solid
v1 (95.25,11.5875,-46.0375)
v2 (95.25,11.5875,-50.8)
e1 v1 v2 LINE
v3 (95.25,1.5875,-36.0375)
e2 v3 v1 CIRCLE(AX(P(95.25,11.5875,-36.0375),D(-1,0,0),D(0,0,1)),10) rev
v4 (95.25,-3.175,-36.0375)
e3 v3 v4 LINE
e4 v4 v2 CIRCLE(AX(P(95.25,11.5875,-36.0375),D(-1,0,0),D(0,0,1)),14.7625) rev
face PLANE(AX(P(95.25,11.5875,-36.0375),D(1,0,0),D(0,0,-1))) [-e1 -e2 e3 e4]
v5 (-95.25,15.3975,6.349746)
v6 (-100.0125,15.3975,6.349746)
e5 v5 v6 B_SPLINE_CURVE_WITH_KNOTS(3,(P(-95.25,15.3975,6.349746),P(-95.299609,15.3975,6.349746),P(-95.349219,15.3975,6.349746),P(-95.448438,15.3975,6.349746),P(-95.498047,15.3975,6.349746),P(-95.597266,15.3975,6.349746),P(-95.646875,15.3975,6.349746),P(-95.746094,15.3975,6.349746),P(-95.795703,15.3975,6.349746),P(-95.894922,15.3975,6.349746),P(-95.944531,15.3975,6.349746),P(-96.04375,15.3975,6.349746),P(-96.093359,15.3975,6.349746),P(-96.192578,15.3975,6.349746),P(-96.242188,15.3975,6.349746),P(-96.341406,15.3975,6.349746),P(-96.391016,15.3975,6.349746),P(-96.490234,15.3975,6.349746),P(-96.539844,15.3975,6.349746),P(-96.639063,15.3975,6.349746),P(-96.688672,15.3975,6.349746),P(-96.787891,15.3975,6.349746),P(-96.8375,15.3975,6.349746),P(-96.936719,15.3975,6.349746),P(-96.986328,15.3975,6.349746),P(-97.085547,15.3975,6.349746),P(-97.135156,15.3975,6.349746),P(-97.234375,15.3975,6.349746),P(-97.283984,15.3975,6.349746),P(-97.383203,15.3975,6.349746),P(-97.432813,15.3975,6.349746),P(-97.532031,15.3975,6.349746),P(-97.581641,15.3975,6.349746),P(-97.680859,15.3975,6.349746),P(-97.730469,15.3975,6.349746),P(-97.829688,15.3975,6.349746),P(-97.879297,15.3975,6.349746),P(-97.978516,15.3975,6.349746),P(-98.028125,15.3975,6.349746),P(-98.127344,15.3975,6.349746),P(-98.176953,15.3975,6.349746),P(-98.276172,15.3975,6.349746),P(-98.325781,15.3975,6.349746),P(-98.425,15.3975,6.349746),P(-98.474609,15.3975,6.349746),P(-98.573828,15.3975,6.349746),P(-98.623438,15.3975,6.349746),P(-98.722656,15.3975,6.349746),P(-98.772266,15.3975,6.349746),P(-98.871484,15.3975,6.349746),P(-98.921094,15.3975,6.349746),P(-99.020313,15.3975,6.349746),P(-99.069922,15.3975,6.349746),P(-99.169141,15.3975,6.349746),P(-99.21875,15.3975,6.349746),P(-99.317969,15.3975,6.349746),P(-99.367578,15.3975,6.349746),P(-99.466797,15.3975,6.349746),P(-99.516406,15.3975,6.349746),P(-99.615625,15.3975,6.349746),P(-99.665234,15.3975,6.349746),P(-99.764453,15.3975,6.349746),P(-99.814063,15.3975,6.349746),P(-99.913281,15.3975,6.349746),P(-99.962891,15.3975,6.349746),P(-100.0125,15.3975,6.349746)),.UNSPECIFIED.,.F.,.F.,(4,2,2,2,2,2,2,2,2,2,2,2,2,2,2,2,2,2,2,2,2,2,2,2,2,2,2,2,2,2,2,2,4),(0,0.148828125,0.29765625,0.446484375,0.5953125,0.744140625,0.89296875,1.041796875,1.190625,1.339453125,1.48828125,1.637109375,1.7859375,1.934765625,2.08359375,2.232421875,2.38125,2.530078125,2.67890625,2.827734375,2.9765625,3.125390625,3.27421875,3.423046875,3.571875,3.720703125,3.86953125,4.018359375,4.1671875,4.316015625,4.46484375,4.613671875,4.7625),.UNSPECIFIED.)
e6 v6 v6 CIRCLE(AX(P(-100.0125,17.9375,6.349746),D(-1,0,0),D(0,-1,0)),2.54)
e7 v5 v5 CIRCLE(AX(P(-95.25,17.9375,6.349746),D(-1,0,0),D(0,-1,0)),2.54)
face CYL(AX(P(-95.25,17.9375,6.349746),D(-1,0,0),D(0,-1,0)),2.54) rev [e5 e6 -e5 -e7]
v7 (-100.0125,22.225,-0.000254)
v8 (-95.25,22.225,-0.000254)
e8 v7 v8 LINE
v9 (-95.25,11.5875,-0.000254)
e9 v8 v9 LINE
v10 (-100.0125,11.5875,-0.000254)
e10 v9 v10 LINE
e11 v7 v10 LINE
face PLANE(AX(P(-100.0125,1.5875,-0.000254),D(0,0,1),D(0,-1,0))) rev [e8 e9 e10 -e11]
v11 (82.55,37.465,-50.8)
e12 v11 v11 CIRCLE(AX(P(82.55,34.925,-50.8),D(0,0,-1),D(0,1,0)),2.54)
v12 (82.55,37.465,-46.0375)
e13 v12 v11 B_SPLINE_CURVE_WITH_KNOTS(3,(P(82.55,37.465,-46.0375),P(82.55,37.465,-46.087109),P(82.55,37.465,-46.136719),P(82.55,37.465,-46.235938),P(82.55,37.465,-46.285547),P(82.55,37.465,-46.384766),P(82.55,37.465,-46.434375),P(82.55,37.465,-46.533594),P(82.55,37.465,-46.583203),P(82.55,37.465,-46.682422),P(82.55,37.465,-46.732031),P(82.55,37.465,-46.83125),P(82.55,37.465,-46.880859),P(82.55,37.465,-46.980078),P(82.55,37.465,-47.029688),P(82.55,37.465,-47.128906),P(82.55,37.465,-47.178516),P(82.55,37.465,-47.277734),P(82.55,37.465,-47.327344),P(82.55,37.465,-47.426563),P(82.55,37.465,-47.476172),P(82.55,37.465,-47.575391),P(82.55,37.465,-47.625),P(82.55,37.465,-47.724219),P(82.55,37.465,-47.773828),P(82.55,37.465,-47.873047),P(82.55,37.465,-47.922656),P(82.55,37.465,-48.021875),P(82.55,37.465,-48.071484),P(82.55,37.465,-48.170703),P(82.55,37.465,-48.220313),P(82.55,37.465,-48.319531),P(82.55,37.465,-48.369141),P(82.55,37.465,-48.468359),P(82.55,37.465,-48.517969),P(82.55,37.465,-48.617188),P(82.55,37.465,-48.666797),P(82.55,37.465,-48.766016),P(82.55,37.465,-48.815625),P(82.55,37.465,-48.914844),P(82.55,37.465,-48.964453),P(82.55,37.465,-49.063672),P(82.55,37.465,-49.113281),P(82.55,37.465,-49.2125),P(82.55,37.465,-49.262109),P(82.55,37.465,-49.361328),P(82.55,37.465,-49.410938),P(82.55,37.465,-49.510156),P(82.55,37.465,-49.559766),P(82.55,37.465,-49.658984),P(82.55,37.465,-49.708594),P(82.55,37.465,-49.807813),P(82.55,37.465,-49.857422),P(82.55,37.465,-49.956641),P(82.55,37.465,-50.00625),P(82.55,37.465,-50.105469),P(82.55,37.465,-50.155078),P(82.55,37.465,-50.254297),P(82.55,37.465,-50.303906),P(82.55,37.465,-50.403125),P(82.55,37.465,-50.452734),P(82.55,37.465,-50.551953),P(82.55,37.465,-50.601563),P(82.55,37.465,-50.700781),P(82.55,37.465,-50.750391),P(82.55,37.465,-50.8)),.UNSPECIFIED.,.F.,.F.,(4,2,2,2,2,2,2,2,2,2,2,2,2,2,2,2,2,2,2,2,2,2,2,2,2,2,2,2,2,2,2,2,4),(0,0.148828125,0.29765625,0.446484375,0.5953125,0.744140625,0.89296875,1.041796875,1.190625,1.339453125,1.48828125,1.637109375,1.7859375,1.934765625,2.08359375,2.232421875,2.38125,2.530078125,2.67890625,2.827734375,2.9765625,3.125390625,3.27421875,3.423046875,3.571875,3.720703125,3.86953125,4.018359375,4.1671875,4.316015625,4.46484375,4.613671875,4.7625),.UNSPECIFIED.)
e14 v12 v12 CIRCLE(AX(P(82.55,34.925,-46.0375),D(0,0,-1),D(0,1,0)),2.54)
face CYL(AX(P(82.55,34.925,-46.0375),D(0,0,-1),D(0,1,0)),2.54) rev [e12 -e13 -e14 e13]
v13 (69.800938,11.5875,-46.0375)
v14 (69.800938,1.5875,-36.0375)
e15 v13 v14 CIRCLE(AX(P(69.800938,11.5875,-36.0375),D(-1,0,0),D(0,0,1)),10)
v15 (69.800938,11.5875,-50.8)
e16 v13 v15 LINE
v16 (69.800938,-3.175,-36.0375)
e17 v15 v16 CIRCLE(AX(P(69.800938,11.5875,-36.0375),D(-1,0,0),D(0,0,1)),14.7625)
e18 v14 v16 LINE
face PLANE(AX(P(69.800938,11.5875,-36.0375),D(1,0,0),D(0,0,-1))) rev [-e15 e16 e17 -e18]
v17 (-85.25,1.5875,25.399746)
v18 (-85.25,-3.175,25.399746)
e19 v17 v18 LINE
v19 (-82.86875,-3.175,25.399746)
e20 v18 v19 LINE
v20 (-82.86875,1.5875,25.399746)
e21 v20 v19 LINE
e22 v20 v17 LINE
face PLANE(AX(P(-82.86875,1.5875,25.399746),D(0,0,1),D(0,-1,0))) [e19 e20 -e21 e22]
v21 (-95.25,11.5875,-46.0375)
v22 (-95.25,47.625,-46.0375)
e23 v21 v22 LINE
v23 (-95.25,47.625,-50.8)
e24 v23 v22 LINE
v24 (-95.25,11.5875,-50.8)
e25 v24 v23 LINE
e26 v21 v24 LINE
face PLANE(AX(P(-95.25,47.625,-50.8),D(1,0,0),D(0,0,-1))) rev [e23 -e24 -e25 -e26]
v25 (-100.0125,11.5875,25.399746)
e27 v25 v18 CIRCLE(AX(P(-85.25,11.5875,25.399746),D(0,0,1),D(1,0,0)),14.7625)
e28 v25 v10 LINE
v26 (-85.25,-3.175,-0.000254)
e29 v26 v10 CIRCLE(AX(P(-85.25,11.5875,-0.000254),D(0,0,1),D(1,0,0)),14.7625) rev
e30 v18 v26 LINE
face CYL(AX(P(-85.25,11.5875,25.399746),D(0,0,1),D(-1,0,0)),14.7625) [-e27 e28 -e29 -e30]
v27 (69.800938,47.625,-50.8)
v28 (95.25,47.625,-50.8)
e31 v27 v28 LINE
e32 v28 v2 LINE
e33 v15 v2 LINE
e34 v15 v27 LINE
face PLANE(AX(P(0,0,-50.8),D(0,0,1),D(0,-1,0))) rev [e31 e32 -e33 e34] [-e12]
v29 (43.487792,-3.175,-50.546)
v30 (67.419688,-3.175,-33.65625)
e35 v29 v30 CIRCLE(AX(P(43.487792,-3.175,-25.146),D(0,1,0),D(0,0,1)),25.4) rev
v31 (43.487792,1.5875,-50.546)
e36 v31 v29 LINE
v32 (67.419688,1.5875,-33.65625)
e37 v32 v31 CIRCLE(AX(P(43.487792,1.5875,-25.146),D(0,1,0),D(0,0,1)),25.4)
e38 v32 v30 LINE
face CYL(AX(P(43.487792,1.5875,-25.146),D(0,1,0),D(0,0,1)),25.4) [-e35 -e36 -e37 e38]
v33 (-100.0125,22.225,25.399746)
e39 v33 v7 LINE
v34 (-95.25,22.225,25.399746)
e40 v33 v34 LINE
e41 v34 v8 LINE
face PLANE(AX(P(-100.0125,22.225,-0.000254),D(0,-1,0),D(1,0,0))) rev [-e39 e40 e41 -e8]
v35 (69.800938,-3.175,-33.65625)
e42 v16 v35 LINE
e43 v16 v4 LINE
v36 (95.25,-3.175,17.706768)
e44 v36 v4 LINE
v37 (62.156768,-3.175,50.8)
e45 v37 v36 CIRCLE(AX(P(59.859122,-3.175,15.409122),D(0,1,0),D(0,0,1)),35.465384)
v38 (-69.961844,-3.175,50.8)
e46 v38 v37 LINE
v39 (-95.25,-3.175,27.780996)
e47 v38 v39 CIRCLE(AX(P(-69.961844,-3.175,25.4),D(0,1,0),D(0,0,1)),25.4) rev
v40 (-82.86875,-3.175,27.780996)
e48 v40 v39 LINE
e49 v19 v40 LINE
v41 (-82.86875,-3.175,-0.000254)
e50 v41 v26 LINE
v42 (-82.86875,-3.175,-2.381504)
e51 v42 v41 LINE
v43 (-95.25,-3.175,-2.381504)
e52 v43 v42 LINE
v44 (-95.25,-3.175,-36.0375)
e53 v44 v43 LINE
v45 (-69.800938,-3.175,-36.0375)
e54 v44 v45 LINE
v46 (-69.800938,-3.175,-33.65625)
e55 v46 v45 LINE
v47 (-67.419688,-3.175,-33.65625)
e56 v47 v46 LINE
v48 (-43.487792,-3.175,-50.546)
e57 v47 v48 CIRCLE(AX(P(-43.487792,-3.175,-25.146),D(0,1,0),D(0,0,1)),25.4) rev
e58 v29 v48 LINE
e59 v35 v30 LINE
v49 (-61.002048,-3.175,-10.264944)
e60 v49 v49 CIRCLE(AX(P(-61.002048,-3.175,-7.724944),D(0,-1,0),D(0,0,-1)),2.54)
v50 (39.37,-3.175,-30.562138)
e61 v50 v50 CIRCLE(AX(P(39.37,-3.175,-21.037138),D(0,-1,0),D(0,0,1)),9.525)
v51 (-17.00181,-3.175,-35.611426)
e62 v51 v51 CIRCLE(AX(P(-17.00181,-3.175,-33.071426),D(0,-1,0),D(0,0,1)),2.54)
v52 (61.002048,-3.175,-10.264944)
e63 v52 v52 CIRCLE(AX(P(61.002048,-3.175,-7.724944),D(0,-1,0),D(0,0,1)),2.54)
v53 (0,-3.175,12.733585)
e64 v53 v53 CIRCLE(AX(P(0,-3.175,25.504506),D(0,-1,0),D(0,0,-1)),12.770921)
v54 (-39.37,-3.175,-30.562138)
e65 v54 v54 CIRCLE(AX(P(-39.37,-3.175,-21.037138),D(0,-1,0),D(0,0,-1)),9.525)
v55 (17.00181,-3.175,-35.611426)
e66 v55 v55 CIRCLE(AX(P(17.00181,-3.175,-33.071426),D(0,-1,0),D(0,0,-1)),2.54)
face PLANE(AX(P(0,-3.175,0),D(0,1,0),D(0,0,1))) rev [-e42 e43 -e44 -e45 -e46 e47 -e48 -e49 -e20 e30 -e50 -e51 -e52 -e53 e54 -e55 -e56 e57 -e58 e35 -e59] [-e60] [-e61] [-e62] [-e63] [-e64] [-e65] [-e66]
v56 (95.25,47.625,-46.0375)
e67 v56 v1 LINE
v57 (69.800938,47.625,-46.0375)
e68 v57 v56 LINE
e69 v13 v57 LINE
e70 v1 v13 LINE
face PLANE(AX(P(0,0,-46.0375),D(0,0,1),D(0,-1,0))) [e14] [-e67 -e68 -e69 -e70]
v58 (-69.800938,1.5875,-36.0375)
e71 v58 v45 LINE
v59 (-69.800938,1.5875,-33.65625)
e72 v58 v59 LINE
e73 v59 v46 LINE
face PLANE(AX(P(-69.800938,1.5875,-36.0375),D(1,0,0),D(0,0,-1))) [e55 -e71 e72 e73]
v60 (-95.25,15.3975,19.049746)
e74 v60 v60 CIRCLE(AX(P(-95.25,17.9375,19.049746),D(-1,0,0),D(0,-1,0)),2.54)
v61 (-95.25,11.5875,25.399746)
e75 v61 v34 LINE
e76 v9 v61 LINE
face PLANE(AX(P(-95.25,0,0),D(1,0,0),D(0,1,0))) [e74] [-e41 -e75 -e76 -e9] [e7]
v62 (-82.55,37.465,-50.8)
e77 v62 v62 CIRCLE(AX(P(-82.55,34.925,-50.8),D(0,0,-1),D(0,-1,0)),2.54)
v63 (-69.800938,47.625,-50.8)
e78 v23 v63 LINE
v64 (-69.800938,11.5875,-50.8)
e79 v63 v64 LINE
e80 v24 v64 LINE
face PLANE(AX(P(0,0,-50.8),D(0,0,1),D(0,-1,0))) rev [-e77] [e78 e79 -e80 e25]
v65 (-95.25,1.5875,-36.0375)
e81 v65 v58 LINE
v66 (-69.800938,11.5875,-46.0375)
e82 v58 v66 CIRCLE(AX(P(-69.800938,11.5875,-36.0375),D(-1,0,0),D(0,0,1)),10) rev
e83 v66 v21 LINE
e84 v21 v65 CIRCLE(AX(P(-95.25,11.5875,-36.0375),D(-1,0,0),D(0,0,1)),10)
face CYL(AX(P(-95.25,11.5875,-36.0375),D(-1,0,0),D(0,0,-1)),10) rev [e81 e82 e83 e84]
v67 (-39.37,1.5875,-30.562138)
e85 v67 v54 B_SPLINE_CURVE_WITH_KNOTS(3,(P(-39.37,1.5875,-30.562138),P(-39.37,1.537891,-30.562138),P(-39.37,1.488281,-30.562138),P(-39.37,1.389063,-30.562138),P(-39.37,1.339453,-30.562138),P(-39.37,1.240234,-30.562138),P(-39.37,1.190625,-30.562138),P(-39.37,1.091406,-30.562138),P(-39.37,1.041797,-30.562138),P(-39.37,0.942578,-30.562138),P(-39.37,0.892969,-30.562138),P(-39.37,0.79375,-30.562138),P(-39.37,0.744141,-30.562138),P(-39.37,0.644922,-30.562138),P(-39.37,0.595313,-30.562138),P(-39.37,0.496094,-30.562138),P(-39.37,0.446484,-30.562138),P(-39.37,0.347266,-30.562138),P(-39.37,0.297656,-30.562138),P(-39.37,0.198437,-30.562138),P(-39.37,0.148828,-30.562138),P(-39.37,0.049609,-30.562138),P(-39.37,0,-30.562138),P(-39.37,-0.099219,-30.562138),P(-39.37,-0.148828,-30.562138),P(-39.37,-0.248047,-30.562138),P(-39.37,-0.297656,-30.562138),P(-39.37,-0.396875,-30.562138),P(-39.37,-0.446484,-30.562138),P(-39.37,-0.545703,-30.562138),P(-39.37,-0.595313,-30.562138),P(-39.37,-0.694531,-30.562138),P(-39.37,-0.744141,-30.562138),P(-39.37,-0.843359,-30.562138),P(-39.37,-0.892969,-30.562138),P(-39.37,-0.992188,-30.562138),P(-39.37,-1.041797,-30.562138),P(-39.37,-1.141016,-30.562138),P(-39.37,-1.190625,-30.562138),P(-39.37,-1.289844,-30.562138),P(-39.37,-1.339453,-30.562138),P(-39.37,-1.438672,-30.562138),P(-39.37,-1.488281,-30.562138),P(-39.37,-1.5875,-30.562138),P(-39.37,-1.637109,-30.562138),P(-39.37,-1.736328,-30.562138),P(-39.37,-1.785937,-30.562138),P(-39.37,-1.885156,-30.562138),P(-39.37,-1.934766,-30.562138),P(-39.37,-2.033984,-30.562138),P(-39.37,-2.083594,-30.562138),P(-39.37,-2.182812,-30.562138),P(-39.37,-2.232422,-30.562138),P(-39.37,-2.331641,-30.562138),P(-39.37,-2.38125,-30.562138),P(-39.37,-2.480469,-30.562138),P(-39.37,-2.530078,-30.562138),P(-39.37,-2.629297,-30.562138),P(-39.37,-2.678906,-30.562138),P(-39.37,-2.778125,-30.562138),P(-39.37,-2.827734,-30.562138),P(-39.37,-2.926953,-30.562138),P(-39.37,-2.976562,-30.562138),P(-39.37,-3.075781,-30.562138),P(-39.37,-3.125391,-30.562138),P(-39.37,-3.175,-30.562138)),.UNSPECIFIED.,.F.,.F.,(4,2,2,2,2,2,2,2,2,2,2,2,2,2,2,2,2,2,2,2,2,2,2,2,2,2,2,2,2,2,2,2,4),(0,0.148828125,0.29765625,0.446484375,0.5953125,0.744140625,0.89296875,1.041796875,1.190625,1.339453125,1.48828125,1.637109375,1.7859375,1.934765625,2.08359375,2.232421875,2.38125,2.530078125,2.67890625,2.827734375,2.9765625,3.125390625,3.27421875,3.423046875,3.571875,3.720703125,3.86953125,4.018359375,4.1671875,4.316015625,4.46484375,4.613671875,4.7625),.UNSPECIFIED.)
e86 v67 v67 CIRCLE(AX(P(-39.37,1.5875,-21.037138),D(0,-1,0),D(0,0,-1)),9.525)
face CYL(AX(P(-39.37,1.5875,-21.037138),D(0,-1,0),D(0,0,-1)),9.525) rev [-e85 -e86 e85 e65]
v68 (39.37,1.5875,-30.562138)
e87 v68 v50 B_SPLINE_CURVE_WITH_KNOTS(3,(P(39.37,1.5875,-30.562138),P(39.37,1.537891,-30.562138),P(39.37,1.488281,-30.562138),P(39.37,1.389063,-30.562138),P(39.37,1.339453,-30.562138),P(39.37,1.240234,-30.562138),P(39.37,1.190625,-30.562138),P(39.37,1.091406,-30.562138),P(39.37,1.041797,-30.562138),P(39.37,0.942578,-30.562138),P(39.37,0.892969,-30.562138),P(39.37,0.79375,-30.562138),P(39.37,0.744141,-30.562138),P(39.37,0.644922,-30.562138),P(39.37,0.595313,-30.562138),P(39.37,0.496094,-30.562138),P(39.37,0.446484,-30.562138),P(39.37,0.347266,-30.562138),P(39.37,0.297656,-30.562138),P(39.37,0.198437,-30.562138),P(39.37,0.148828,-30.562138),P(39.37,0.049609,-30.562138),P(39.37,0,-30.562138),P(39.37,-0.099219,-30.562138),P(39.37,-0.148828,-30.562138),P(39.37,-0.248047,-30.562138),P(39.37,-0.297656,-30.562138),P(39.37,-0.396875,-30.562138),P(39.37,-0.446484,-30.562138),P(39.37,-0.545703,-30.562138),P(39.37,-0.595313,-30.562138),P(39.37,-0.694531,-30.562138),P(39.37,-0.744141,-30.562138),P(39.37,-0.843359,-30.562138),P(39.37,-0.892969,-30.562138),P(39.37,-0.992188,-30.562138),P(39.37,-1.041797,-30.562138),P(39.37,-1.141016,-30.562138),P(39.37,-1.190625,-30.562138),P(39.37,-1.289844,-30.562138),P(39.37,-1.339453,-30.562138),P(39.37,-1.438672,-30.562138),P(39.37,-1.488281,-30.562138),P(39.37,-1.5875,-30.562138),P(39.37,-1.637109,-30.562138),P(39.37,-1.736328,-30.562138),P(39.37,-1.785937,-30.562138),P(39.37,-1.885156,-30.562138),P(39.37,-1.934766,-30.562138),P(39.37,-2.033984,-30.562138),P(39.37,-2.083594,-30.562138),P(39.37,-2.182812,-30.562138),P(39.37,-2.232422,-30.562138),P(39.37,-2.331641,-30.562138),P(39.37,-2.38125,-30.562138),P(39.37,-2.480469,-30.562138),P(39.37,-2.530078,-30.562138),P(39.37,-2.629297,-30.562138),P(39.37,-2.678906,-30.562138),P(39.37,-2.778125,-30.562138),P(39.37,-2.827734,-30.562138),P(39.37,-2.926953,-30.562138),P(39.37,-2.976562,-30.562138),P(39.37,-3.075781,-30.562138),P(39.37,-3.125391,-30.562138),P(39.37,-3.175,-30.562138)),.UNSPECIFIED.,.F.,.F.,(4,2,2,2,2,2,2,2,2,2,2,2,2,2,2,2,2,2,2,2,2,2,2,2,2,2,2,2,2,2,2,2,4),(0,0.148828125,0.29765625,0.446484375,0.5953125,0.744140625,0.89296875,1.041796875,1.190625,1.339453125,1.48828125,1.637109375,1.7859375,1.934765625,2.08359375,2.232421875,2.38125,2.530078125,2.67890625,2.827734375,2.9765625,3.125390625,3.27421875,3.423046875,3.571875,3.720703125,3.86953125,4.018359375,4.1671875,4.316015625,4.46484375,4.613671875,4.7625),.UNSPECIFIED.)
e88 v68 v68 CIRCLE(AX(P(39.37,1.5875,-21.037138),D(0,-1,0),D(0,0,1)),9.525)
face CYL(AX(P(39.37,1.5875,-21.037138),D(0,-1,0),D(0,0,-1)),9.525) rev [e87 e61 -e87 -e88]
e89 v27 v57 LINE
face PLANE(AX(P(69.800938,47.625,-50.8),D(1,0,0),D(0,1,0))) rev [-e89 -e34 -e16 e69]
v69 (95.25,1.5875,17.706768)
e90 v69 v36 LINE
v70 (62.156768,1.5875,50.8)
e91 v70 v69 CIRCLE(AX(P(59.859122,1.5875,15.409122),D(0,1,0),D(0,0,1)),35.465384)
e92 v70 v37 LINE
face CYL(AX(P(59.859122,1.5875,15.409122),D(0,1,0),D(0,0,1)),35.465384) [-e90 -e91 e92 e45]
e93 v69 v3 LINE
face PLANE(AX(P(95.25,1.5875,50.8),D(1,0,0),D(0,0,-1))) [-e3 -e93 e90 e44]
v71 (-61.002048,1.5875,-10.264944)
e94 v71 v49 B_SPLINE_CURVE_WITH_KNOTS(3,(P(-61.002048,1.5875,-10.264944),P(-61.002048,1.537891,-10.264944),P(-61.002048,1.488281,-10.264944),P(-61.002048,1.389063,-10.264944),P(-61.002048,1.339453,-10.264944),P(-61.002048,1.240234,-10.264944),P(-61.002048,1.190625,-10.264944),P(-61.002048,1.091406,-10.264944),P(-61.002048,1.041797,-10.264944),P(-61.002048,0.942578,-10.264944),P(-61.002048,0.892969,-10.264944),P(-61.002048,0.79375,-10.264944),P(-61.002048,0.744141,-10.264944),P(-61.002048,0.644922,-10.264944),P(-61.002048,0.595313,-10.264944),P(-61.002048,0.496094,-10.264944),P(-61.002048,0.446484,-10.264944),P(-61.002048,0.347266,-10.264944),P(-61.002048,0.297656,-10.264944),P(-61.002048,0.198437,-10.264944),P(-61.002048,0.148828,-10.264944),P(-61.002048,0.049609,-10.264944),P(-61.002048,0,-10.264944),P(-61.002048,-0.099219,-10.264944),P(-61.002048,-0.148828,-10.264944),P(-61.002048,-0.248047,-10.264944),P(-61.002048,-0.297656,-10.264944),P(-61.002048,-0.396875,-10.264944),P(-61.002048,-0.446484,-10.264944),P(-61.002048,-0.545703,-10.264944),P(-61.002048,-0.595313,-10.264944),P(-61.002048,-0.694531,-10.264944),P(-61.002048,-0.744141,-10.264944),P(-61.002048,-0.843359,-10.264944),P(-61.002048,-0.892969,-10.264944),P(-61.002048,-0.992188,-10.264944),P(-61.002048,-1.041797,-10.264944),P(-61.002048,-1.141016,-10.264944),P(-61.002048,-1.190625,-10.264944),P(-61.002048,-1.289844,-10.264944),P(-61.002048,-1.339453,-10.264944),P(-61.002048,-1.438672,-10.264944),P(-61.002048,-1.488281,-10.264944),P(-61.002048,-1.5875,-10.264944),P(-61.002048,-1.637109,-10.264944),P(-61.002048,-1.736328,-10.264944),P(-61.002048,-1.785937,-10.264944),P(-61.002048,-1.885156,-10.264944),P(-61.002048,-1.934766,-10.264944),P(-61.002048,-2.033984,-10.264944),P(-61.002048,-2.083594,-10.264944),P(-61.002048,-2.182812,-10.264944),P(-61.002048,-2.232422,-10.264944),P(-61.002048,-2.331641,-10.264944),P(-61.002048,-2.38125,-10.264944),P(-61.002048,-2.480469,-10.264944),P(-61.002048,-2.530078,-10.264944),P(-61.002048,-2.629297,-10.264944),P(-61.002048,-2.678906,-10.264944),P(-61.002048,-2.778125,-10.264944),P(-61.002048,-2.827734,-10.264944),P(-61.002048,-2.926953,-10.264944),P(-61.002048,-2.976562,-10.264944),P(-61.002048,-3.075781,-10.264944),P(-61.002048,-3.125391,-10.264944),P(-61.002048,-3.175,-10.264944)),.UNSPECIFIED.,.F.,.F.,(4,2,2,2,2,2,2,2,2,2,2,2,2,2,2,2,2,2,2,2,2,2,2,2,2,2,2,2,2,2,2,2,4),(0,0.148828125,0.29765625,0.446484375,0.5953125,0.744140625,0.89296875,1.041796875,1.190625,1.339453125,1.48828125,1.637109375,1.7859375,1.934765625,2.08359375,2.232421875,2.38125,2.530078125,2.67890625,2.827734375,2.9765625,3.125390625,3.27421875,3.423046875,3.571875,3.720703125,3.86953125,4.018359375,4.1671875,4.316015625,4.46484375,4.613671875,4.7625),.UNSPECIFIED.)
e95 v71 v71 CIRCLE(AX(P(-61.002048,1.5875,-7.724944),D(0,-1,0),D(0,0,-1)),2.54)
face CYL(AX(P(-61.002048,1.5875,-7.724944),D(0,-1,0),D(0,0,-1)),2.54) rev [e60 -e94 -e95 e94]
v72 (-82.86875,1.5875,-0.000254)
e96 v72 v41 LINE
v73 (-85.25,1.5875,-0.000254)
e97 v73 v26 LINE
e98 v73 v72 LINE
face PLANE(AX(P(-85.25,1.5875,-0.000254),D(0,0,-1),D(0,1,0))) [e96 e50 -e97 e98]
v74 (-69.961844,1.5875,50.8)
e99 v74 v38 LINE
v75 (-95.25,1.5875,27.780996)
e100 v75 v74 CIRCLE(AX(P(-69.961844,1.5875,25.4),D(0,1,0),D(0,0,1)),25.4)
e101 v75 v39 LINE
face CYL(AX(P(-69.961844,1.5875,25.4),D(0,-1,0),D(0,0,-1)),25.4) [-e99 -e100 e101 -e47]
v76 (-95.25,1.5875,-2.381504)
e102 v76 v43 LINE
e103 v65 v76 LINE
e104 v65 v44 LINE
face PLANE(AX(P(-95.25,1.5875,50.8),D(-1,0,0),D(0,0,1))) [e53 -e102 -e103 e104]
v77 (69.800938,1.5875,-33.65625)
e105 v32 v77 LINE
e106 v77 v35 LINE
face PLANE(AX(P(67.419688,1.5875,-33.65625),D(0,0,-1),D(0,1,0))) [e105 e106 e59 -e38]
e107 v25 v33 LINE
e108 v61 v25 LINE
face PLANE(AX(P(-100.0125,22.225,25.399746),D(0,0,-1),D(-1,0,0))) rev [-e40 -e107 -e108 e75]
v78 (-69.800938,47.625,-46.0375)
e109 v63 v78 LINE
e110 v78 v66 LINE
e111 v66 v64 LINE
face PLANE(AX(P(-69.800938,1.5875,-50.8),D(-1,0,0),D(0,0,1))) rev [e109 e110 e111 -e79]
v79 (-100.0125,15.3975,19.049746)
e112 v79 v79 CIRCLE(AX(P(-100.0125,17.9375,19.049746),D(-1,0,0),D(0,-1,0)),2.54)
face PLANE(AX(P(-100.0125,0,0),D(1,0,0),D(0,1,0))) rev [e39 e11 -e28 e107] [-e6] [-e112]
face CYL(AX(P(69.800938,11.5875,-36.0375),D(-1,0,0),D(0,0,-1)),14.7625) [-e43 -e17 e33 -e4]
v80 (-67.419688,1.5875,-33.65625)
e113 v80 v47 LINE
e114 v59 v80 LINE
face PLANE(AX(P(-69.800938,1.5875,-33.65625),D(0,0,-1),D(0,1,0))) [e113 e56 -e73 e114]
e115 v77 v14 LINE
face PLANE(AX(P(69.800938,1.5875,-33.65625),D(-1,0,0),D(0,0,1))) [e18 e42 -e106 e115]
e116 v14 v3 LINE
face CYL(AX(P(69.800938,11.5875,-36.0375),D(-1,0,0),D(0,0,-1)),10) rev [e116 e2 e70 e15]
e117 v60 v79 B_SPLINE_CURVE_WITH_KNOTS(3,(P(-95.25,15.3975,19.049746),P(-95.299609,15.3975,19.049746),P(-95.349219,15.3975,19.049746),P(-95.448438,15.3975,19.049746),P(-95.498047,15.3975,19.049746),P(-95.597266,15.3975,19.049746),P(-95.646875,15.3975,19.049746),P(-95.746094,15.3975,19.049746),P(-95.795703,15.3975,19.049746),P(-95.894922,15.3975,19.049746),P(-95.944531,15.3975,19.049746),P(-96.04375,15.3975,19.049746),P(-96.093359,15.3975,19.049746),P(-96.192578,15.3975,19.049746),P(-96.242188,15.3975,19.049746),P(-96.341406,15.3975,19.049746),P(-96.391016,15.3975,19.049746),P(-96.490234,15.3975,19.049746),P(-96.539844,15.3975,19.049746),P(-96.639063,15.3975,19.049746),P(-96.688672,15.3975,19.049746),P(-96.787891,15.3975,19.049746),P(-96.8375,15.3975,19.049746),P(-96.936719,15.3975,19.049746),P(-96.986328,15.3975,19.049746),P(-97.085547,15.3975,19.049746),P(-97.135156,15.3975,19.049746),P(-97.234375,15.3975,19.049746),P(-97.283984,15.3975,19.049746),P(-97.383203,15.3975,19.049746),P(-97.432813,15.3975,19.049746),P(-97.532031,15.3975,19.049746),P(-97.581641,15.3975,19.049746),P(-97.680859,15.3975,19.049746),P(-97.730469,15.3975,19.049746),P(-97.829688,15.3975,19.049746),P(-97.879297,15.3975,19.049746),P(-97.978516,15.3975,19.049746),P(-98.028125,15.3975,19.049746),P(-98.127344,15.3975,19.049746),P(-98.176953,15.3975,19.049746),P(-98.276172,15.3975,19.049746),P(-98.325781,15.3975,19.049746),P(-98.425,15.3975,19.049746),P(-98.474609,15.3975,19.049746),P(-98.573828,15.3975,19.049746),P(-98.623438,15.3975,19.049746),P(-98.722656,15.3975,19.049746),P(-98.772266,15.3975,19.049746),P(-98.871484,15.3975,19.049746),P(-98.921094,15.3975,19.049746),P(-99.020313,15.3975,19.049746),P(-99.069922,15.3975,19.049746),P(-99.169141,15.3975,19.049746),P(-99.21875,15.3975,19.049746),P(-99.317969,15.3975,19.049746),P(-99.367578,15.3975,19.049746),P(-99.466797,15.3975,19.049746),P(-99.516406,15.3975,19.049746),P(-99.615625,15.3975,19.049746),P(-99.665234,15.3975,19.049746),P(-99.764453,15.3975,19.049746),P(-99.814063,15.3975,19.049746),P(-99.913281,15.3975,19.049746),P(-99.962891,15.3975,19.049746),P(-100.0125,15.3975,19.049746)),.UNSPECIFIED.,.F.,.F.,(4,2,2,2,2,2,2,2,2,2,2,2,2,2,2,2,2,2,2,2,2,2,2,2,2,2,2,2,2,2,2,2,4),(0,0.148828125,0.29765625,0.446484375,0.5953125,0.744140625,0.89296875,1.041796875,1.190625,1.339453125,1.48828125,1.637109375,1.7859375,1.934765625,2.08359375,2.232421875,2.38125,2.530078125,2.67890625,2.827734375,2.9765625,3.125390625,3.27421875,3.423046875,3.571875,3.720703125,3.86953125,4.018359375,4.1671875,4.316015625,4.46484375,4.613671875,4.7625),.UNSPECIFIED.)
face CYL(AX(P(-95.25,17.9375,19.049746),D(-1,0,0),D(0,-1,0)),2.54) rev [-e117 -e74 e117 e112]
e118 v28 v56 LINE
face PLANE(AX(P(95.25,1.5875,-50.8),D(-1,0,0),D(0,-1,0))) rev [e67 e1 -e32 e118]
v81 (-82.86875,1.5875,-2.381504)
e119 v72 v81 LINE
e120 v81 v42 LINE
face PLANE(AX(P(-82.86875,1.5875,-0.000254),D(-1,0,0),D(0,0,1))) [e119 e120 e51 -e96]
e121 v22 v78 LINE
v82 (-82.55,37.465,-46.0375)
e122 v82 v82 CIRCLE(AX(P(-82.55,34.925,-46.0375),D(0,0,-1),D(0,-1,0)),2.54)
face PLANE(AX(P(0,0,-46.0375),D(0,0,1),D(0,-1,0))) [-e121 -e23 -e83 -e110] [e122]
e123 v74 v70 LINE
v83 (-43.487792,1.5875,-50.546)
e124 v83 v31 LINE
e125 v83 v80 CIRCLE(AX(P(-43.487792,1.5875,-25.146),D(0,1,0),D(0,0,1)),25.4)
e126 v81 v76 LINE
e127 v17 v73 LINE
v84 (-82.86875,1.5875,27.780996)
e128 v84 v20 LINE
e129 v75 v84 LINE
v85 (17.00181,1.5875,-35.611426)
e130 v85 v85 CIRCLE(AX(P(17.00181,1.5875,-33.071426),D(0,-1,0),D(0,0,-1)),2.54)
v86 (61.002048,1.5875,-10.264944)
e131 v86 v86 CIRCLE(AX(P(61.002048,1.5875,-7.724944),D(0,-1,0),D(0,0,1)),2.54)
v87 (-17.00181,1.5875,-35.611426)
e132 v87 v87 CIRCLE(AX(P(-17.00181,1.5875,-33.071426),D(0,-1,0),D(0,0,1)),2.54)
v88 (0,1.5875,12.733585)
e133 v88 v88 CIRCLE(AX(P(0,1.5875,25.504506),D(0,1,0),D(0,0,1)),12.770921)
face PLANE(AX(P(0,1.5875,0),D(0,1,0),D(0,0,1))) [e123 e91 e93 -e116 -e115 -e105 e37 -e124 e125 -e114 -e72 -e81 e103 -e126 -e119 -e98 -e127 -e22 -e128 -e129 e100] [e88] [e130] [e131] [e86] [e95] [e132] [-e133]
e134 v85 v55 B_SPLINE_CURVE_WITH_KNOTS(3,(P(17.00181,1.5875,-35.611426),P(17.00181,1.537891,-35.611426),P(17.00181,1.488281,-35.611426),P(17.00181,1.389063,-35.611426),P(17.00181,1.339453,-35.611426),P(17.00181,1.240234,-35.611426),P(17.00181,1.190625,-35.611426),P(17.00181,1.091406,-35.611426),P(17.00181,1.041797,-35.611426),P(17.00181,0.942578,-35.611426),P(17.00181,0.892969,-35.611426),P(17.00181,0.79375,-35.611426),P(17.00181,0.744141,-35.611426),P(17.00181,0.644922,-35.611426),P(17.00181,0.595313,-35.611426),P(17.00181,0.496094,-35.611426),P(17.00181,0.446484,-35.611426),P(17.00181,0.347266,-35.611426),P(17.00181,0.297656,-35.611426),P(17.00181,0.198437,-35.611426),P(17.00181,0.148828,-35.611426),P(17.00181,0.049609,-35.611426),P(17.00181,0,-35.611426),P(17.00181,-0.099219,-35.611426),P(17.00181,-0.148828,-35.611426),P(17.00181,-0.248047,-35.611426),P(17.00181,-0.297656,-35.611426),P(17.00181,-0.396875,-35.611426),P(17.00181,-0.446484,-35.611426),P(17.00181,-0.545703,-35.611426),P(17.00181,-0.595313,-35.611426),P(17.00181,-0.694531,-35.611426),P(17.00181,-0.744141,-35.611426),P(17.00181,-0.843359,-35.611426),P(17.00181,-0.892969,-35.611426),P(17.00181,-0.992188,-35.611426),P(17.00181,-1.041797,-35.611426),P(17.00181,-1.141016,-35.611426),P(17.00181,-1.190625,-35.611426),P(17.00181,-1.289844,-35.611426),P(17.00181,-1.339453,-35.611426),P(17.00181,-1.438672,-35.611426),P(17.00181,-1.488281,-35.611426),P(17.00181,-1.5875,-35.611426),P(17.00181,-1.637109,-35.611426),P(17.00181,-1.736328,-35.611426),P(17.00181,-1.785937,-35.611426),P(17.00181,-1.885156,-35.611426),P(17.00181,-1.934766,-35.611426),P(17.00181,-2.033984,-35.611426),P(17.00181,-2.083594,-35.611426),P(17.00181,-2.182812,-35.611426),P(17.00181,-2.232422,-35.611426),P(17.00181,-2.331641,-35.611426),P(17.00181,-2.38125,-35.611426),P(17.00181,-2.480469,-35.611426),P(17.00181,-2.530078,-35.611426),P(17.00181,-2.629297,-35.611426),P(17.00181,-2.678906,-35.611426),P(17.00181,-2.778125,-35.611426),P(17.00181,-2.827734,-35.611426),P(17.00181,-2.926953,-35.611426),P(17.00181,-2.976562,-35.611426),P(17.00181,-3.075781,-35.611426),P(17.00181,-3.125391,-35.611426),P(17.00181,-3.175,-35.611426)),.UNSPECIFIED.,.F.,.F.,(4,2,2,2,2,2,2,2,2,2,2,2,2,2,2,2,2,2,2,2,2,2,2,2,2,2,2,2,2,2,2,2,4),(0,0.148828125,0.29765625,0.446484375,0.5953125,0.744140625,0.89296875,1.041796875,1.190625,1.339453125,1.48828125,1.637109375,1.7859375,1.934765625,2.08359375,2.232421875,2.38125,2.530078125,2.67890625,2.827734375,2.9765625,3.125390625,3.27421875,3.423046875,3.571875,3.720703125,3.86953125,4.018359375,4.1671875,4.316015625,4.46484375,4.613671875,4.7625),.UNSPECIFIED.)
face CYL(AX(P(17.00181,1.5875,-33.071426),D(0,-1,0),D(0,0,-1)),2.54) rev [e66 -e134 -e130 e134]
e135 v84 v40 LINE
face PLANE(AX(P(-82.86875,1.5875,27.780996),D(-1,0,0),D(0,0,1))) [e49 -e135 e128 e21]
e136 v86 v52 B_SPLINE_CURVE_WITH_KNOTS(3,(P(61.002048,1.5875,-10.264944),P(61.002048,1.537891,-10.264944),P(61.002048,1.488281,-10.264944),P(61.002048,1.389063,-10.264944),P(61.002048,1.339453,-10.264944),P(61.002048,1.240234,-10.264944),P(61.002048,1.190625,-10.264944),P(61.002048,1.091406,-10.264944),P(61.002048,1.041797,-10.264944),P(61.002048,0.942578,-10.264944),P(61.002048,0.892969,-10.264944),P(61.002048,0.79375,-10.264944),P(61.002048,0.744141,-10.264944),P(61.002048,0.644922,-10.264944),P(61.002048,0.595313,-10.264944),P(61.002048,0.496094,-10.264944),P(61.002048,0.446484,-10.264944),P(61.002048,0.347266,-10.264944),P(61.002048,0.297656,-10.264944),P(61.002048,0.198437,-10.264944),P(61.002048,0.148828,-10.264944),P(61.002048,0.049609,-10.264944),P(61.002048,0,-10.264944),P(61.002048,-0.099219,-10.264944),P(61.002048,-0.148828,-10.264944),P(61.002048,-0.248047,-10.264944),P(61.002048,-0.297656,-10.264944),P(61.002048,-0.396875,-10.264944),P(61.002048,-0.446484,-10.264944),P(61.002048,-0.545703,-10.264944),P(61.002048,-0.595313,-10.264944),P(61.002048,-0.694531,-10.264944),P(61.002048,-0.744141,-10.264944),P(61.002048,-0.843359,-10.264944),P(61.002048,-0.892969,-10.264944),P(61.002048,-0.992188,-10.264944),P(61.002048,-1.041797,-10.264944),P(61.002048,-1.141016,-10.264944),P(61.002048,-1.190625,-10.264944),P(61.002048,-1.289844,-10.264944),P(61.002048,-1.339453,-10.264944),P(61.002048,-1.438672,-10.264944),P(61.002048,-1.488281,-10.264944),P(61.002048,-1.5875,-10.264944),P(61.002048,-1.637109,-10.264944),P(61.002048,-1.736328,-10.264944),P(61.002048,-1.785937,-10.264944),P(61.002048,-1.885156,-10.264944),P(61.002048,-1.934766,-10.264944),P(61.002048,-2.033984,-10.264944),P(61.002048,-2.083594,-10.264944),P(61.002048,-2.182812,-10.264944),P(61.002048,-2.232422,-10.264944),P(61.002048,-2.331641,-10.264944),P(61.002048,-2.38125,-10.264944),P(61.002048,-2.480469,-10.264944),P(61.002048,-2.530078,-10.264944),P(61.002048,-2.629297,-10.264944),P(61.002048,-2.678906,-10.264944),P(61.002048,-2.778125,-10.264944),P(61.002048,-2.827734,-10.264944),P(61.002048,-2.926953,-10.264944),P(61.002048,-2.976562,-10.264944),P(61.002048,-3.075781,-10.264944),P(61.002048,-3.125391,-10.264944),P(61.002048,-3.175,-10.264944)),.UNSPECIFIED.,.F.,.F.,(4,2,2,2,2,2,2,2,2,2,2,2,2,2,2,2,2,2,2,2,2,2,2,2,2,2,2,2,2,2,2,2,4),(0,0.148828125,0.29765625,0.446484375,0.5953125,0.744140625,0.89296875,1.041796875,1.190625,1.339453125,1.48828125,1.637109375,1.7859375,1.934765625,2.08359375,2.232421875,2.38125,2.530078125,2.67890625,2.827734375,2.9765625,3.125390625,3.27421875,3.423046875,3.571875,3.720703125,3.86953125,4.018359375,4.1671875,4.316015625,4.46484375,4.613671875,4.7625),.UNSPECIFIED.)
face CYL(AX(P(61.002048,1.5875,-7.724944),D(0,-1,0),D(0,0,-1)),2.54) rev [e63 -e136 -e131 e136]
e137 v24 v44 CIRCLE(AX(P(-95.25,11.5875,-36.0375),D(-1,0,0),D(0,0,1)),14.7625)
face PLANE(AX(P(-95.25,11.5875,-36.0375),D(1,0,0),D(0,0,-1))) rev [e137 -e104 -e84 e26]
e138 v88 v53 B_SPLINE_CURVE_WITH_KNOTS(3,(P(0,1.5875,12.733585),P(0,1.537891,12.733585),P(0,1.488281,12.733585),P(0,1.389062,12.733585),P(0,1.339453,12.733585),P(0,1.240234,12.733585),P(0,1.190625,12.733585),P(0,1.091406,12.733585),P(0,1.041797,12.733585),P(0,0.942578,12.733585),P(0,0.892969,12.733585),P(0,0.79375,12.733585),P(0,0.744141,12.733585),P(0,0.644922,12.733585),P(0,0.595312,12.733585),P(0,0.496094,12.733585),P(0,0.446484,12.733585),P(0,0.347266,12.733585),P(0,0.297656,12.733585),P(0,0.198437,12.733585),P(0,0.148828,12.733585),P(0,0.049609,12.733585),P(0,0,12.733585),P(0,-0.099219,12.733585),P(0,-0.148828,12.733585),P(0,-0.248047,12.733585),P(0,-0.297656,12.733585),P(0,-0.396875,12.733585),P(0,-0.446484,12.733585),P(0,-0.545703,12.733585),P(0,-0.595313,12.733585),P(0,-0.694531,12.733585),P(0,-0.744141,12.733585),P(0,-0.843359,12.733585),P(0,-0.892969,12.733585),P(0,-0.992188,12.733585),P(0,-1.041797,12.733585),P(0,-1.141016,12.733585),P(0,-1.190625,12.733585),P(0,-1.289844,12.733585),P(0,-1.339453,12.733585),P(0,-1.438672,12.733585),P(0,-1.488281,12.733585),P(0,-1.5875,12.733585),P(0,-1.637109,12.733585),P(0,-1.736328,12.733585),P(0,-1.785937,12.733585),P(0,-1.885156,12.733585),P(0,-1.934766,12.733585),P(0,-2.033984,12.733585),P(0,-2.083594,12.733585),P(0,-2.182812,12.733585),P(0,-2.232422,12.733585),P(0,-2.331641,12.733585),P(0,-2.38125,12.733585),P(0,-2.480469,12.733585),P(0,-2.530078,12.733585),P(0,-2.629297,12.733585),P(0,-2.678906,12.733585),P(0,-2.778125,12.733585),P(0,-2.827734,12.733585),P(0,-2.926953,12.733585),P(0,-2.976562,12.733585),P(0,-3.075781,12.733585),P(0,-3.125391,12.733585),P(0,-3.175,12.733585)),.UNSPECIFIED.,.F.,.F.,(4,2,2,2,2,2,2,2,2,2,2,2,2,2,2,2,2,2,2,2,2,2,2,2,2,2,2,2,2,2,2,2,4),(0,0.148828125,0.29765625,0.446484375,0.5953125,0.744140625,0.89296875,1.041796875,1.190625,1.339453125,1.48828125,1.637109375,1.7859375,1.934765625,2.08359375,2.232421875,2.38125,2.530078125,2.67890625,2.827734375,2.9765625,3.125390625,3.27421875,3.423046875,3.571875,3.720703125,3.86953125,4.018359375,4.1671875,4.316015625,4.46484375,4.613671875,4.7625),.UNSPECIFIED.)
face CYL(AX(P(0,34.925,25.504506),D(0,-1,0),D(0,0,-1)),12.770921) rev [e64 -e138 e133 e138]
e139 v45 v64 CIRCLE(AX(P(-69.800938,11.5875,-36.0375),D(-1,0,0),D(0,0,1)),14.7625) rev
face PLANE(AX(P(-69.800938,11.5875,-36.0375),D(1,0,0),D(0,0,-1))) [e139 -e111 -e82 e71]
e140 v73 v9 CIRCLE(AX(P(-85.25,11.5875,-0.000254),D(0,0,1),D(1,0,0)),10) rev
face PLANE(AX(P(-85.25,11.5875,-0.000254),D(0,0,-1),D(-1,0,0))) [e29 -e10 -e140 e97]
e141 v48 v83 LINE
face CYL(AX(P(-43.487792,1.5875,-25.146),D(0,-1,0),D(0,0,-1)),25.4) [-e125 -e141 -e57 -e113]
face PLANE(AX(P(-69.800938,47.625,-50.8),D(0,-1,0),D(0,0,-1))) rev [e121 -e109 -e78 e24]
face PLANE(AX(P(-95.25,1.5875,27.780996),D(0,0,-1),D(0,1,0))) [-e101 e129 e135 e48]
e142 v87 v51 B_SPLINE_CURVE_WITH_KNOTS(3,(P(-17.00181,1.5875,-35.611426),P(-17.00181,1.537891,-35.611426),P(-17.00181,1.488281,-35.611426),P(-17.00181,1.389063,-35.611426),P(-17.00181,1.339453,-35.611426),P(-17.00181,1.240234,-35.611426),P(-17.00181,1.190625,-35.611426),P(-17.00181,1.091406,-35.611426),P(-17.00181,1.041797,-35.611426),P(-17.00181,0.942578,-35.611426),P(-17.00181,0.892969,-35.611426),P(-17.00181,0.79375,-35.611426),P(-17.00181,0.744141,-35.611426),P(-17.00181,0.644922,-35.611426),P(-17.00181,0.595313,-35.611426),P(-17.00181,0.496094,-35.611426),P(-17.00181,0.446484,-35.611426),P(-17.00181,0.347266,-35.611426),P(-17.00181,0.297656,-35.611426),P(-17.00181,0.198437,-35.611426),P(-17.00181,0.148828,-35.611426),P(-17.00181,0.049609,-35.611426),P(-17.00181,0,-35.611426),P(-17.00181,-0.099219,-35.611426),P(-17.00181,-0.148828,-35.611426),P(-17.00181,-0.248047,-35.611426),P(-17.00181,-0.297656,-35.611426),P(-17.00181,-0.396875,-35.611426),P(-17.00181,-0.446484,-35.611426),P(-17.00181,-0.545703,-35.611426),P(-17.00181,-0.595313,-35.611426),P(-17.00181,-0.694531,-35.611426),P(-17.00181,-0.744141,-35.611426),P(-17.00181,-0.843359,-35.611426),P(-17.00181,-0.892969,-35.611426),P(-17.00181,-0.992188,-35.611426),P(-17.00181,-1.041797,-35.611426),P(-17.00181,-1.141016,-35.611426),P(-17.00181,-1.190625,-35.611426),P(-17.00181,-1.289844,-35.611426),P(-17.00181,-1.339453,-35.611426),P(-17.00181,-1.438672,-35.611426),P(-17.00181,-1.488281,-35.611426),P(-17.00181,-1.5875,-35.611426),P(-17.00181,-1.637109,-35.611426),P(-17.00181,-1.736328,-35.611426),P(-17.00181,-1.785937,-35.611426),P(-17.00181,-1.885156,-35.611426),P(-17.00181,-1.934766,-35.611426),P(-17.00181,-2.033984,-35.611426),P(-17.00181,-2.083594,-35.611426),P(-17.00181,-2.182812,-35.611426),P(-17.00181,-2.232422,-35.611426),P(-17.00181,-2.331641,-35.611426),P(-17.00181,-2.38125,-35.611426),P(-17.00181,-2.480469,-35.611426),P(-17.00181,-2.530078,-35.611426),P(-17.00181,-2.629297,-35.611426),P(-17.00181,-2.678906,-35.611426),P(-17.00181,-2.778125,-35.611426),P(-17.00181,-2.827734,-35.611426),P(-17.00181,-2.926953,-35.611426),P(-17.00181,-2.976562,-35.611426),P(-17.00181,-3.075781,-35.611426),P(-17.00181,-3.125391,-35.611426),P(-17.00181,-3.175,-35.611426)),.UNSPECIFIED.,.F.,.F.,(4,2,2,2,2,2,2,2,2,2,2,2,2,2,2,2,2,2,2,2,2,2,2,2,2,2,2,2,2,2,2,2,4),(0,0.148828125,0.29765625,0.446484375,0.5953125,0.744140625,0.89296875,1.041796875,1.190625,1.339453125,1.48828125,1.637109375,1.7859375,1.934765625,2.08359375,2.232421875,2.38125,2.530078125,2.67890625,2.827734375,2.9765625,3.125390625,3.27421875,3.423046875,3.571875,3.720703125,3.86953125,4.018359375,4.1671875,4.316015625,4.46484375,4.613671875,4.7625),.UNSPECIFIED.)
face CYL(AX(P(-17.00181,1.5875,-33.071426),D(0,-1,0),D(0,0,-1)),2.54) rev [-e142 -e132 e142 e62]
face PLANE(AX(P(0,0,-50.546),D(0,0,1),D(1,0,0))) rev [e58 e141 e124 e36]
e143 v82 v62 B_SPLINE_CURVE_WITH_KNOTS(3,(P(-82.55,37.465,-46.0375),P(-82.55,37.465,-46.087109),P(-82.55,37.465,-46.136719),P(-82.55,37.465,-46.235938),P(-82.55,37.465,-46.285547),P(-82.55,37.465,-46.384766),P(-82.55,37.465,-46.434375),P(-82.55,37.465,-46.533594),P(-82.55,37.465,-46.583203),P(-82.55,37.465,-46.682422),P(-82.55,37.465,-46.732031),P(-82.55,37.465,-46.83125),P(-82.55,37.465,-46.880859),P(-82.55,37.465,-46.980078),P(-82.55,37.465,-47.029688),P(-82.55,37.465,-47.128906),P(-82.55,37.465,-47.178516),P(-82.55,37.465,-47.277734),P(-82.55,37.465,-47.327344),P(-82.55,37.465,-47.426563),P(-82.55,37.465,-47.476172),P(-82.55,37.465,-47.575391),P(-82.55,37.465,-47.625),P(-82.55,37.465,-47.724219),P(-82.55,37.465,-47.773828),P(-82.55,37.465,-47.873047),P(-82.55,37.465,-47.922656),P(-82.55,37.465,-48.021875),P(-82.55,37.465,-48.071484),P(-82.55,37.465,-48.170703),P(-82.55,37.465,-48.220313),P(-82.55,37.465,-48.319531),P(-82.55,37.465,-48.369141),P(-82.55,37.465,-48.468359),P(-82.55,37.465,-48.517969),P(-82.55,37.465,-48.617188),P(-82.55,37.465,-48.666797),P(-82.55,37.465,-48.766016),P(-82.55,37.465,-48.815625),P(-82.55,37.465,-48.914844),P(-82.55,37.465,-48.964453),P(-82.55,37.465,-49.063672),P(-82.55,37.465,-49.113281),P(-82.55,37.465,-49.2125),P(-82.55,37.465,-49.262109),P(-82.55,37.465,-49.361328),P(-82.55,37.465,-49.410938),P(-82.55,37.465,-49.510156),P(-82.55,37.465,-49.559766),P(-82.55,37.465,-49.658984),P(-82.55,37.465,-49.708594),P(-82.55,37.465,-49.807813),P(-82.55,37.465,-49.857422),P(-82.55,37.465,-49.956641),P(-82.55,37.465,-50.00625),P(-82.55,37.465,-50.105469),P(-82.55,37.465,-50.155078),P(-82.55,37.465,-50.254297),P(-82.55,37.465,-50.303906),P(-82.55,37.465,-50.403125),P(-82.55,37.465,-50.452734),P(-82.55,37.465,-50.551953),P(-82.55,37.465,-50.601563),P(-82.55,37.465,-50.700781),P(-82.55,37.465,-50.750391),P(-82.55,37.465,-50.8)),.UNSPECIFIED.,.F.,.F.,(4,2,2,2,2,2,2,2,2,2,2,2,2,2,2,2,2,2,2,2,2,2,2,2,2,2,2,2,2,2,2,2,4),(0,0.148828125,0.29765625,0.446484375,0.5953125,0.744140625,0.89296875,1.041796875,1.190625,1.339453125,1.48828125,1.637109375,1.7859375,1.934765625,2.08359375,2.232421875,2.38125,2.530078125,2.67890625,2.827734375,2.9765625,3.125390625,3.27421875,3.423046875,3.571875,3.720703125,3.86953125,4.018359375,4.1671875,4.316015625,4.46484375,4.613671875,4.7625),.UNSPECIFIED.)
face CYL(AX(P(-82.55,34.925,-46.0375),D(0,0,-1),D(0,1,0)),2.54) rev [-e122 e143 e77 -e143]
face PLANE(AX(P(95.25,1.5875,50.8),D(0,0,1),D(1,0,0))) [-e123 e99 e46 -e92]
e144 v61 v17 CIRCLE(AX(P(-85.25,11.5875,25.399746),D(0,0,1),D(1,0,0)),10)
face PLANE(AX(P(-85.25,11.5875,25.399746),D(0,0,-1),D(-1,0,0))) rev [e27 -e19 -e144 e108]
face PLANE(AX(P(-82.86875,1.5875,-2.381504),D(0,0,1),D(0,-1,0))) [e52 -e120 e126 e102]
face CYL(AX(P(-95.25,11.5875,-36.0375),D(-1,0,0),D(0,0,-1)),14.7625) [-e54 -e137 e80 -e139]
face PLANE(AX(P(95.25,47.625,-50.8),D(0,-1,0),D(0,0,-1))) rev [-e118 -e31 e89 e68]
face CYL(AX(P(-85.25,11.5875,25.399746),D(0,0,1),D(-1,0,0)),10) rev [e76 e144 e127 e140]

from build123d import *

# Parameters (mm, degrees)
SKETCH1_W                     = 190.5
SKETCH1_H                     = 101.6
BOSS_EXTRUDE1_DEPTH           = 1.5875
CONVERT_SOLID1_START          = -95.25
CONVERT_SOLID1_OUTLINE_W      = 3.175
CONVERT_SOLID1_OUTLINE_H      = 101.6
CONVERT_SOLID1_DEPTH          = 190.5
SKETCH30_R                    = 12.770921212
CUT_EXTRUDE6_DEPTH            = 38.1
SKETCH35_W                    = 139.601875342
SKETCH35_H                    = 6.35
CUT_EXTRUDE7_DEPTH            = 0.254
EDGE_FLANGE1_STRIP_W          = 39.05
EDGE_FLANGE1_STRIP_H          = 4.7625
EDGE_FLANGE1_STRIP_CUT_DEPTH  = 25.449062329
EDGE_FLANGE1_RELIEF_W         = 41.43125
EDGE_FLANGE1_RELIEF_H         = 2.38125
EDGE_FLANGE1_RELIEF_CUT_DEPTH = 4.7625
EDGE_FLANGE1_DEPTH            = 25.449062329
EDGE_FLANGE2_STRIP_W          = 39.05
EDGE_FLANGE2_STRIP_H          = 4.7625
EDGE_FLANGE2_STRIP_CUT_DEPTH  = 25.449062329
EDGE_FLANGE2_RELIEF_W         = 41.43125
EDGE_FLANGE2_RELIEF_H         = 2.38125
EDGE_FLANGE2_RELIEF_CUT_DEPTH = 4.7625
EDGE_FLANGE2_DEPTH            = 25.449062329
SKETCH45_W                    = 4.7625
SKETCH45_H                    = 0.000254
CUT_EXTRUDE10_DEPTH           = 25.4
EDGE_FLANGE4_STRIP_W          = 39.05
EDGE_FLANGE4_STRIP_H          = 4.7625
EDGE_FLANGE4_STRIP_CUT_DEPTH  = 25.4
EDGE_FLANGE4_RELIEF_W         = 41.43125
EDGE_FLANGE4_RELIEF_H         = 2.38125
EDGE_FLANGE4_RELIEF_CUT_DEPTH = 4.7625
EDGE_FLANGE4_DEPTH            = 25.4
FILLET9_R                     = 25.4
CUT_EXTRUDE11_DEPTH           = 25.4
FILLET10_R                    = 25.4
SKETCH53_R                    = 2.54
CUT_EXTRUDE12_DEPTH           = 4.7625
SKETCH54_R                    = 2.54
CUT_EXTRUDE13_DEPTH           = 4.7625
SKETCH55_R                    = 9.525
SKETCH55_R_2                  = 2.54
CUT_EXTRUDE14_DEPTH           = 4.7625


# Read off the part's stored shape, not the designer's step: Convert-Solid1
# Sheet-metal steps are written as plain solids
with BuildPart() as part:
    # Sketch1 → Boss-Extrude1 (new body)
    with BuildSketch(Plane(origin=(0, 0, 0), x_dir=(1, 0, 0), z_dir=(0, 1, 0))):
        Rectangle(SKETCH1_W, SKETCH1_H)
    extrude(amount=BOSS_EXTRUDE1_DEPTH)

    # Convert-Solid1 outline → Convert-Solid1 (add)
    with BuildSketch(Plane.YZ.offset(CONVERT_SOLID1_START)):
        with Locations((-1.5875, 0)):
            Rectangle(CONVERT_SOLID1_OUTLINE_W, CONVERT_SOLID1_OUTLINE_H)
    extrude(amount=CONVERT_SOLID1_DEPTH)

    # Sketch30 → Cut-Extrude6 (cut)
    with BuildSketch(Plane(origin=(0, -3.175, 0), x_dir=(-1, 0, 0), z_dir=(0, -1, 0))):
        with Locations(Location((0, -25.504506424, 0), (0, 0, 90))):
            Circle(SKETCH30_R)
    extrude(amount=-CUT_EXTRUDE6_DEPTH, mode=Mode.SUBTRACT)

    # Sketch35 → Cut-Extrude7 (cut)
    with BuildSketch(Plane(origin=(0, 0, -50.8), x_dir=(-1, 0, 0), z_dir=(0, 0, -1))):
        Rectangle(SKETCH35_W, SKETCH35_H)
    extrude(amount=-CUT_EXTRUDE7_DEPTH, mode=Mode.SUBTRACT)

    # Edge-Flange1 strip (across the edge) → Edge-Flange1 strip cut (cut)
    with BuildSketch(Plane(origin=(95.25, 1.5875, -50.8), x_dir=(0, 0, 1), z_dir=(-1, 0, 0))):
        with Locations((-4.7625, -2.38125)):
            Rectangle(EDGE_FLANGE1_STRIP_W, EDGE_FLANGE1_STRIP_H)
    extrude(amount=EDGE_FLANGE1_STRIP_CUT_DEPTH, mode=Mode.SUBTRACT)

    # Edge-Flange1 relief (on the sheet) → Edge-Flange1 relief cut (cut)
    with BuildSketch(Plane(origin=(95.25, 1.5875, -36.0375), x_dir=(0, 0, 1), z_dir=(0, 1, 0))):
        with Locations((-18.334375, -26.639687329)):
            Rectangle(EDGE_FLANGE1_RELIEF_W, EDGE_FLANGE1_RELIEF_H)
    extrude(amount=-EDGE_FLANGE1_RELIEF_CUT_DEPTH, mode=Mode.SUBTRACT)

    # Edge-Flange1 section (across the edge) → Edge-Flange1 (add)
    with BuildSketch(Plane(origin=(95.25, 1.5875, -50.8), x_dir=(0, 0, 1), z_dir=(-1, 0, 0))):
        with BuildLine():
            Line((0, 10), (0, 46.0375))
            Line((0, 46.0375), (4.7625, 46.0375))
            Line((4.7625, 46.0375), (4.7625, 10))
            ThreePointArc((4.7625, 10), (7.691432188, 2.928932188), (14.7625, 0))
            Line((14.7625, 0), (14.7625, -4.7625))
            ThreePointArc((14.7625, -4.7625), (4.323836143, -0.438663857), (0, 10))
        make_face()
    extrude(amount=EDGE_FLANGE1_DEPTH)

    # Edge-Flange2 strip (across the edge) → Edge-Flange2 strip cut (cut)
    with BuildSketch(Plane(origin=(-69.800937671, 1.5875, -50.8), x_dir=(0, 0, 1), z_dir=(-1, 0, 0))):
        with Locations((-4.7625, -2.38125)):
            Rectangle(EDGE_FLANGE2_STRIP_W, EDGE_FLANGE2_STRIP_H)
    extrude(amount=EDGE_FLANGE2_STRIP_CUT_DEPTH, mode=Mode.SUBTRACT)

    # Edge-Flange2 relief (on the sheet) → Edge-Flange2 relief cut (cut)
    with BuildSketch(Plane(origin=(-69.800937671, 1.5875, -36.0375), x_dir=(0, 0, 1), z_dir=(0, 1, 0))):
        with Locations((-18.334375, 1.190625)):
            Rectangle(EDGE_FLANGE2_RELIEF_W, EDGE_FLANGE2_RELIEF_H)
    extrude(amount=-EDGE_FLANGE2_RELIEF_CUT_DEPTH, mode=Mode.SUBTRACT)

    # Edge-Flange2 section (across the edge) → Edge-Flange2 (add)
    with BuildSketch(Plane(origin=(-69.800937671, 1.5875, -50.8), x_dir=(0, 0, 1), z_dir=(-1, 0, 0))):
        with BuildLine():
            Line((0, 10), (0, 46.0375))
            Line((0, 46.0375), (4.7625, 46.0375))
            Line((4.7625, 46.0375), (4.7625, 10))
            ThreePointArc((4.7625, 10), (7.691432188, 2.928932188), (14.7625, 0))
            Line((14.7625, 0), (14.7625, -4.7625))
            ThreePointArc((14.7625, -4.7625), (4.323836143, -0.438663857), (0, 10))
        make_face()
    extrude(amount=EDGE_FLANGE2_DEPTH)

    # Sketch45 → Cut-Extrude10 (cut)
    with BuildSketch(Plane(origin=(0, 1.5875, 0), x_dir=(1, 0, 0), z_dir=(0, 1, 0))):
        with Locations((-92.86875, -25.399873)):
            Rectangle(SKETCH45_W, SKETCH45_H)
        with Locations((-92.86875, 0.000381)):
            Rectangle(SKETCH45_W, SKETCH45_H)
    extrude(amount=-CUT_EXTRUDE10_DEPTH, mode=Mode.SUBTRACT)

    # Edge-Flange4 strip (across the edge) → Edge-Flange4 strip cut (cut)
    with BuildSketch(Plane(origin=(-95.25, 1.5875, -0.000254), x_dir=(1, 0, 0), z_dir=(0, 0, 1))):
        with Locations((-9.525, -2.38125)):
            Rectangle(EDGE_FLANGE4_STRIP_W, EDGE_FLANGE4_STRIP_H)
    extrude(amount=EDGE_FLANGE4_STRIP_CUT_DEPTH, mode=Mode.SUBTRACT)

    # Edge-Flange4 relief (on the sheet) → Edge-Flange4 relief cut (cut)
    with BuildSketch(Plane(origin=(-85.25, 1.5875, -0.000254), x_dir=(1, 0, 0), z_dir=(0, 1, 0))):
        with Locations((-18.334375, 1.190625)):
            Rectangle(EDGE_FLANGE4_RELIEF_W, EDGE_FLANGE4_RELIEF_H)
        with Locations((-18.334375, -26.590625)):
            Rectangle(EDGE_FLANGE4_RELIEF_W, EDGE_FLANGE4_RELIEF_H)
    extrude(amount=-EDGE_FLANGE4_RELIEF_CUT_DEPTH, mode=Mode.SUBTRACT)

    # Edge-Flange4 section (across the edge) → Edge-Flange4 (add)
    with BuildSketch(Plane(origin=(-95.25, 1.5875, -0.000254), x_dir=(1, 0, 0), z_dir=(0, 0, 1))):
        with BuildLine():
            Line((-4.7625, 10), (-4.7625, 20.6375))
            Line((-4.7625, 20.6375), (0, 20.6375))
            Line((0, 20.6375), (0, 10))
            ThreePointArc((0, 10), (2.928932188, 2.928932188), (10, 0))
            Line((10, 0), (10, -4.7625))
            ThreePointArc((10, -4.7625), (-0.438663857, -0.438663857), (-4.7625, 10))
        make_face()
    extrude(amount=EDGE_FLANGE4_DEPTH)

    # Fillet9
    # the kernel refuses this fillet: 25.4 mm, written as the material it takes off along each edge
    with BuildSketch(Plane(origin=(-67.419687671, 61.417239936, -50.546), x_dir=(1, 0, 0), z_dir=(0, -1, 0))) as fillet9_piece_1:
        with BuildLine():
            CenterArc((23.931895975, 25.4), FILLET9_R, 199.575530564, 70.424469436)
            Line((0, 16.88975), (-0.478637919, 16.719545))
            ThreePointArc((-0.478637919, 16.719545), (-0.508, 8.444875), (-0.508, 0))
            Line((-0.508, 0), (0, -0.508))
            Line((0, -0.508), (23.931895975, -0.508))
            Line((23.931895975, -0.508), (23.931895975, 0))
        make_face()
    extrude(amount=124.421979873, mode=Mode.SUBTRACT)
    with BuildSketch(Plane(origin=(67.419687671, 61.417239936, -50.546), x_dir=(0, 0, 1), z_dir=(0, -1, 0))) as fillet9_piece_2:
        with BuildLine():
            CenterArc((25.4, 23.931895975), FILLET9_R, 180, 70.424469436)
            Line((0, 23.931895975), (-0.508, 23.931895975))
            Line((-0.508, 23.931895975), (-0.508, 0))
            Line((-0.508, 0), (0, -0.508))
            ThreePointArc((0, -0.508), (8.444875, -0.508), (16.719545, -0.478637919))
            Line((16.719545, -0.478637919), (16.88975, 0))
        make_face()
    extrude(amount=124.421979873, mode=Mode.SUBTRACT)

    # Sketch52 → Cut-Extrude11 (cut)
    with BuildSketch(Plane.XZ.offset(3.175)):
        with BuildLine():
            ThreePointArc((62.156767956, 50.8), (84.936935051, 40.486935051), (95.25, 17.706767956))
            Line((95.25, 17.706767956), (95.25, 50.8))
            Line((95.25, 50.8), (62.156767956, 50.8))
        make_face()
    extrude(amount=-CUT_EXTRUDE11_DEPTH, mode=Mode.SUBTRACT)

    # Fillet10
    # the kernel refuses this fillet: 25.4 mm, written as the material it takes off along each edge
    with BuildSketch(Plane(origin=(-95.25, 64.807891195, 50.8), x_dir=(1, 0, 0), z_dir=(0, -1, 0))) as fillet10_piece_1:
        with BuildLine():
            CenterArc((25.288156478, -25.4), FILLET10_R, 90, 84.621196501)
            Line((0, -23.019004), (-0.50576313, -22.97138408))
            ThreePointArc((-0.50576313, -22.97138408), (-0.508, -11.509502), (-0.508, 0))
            Line((-0.508, 0), (0, 0.508))
            Line((0, 0.508), (25.288156478, 0.508))
            Line((25.288156478, 0.508), (25.288156478, 0))
        make_face()
    extrude(amount=131.203282389, mode=Mode.SUBTRACT)

    # Sketch53 → Cut-Extrude12 (cut)
    with BuildSketch(Plane.ZY.offset(100.0125)):
        with Locations(Location((6.349746, 17.9375, 0), (0, 0, 270))):
            Circle(SKETCH53_R)
        with Locations(Location((19.049746, 17.9375, 0), (0, 0, 270))):
            Circle(SKETCH53_R)
    extrude(amount=-CUT_EXTRUDE12_DEPTH, mode=Mode.SUBTRACT)

    # Sketch54 → Cut-Extrude13 (cut)
    with BuildSketch(Plane(origin=(0, 0, -50.8), x_dir=(-1, 0, 0), z_dir=(0, 0, -1))):
        with Locations(Location((-82.55, 34.925, 0), (0, 0, 90))):
            Circle(SKETCH54_R)
        with Locations(Location((82.55, 34.925, 0), (0, 0, 90))):
            Circle(SKETCH54_R)
    extrude(amount=-CUT_EXTRUDE13_DEPTH, mode=Mode.SUBTRACT)

    # Sketch55 → Cut-Extrude14 (cut)
    with BuildSketch(Plane.XZ.offset(3.175)):
        with Locations(Location((-39.37, -21.037138368, 0), (0, 0, 270))):
            Circle(SKETCH55_R)
        with Locations(Location((39.37, -21.037138368, 0), (0, 0, 270))):
            Circle(SKETCH55_R)
        with Locations(Location((-17.001810213, -33.071426284, 0), (0, 0, 270))):
            Circle(SKETCH55_R_2)
        with Locations(Location((-61.002047674, -7.724944205, 0), (0, 0, 270))):
            Circle(SKETCH55_R_2)
        with Locations(Location((61.002047674, -7.724944205, 0), (0, 0, 270))):
            Circle(SKETCH55_R_2)
        with Locations(Location((17.001810213, -33.071426284, 0), (0, 0, 270))):
            Circle(SKETCH55_R_2)
    extrude(amount=-CUT_EXTRUDE14_DEPTH, mode=Mode.SUBTRACT)


solid = part.part
